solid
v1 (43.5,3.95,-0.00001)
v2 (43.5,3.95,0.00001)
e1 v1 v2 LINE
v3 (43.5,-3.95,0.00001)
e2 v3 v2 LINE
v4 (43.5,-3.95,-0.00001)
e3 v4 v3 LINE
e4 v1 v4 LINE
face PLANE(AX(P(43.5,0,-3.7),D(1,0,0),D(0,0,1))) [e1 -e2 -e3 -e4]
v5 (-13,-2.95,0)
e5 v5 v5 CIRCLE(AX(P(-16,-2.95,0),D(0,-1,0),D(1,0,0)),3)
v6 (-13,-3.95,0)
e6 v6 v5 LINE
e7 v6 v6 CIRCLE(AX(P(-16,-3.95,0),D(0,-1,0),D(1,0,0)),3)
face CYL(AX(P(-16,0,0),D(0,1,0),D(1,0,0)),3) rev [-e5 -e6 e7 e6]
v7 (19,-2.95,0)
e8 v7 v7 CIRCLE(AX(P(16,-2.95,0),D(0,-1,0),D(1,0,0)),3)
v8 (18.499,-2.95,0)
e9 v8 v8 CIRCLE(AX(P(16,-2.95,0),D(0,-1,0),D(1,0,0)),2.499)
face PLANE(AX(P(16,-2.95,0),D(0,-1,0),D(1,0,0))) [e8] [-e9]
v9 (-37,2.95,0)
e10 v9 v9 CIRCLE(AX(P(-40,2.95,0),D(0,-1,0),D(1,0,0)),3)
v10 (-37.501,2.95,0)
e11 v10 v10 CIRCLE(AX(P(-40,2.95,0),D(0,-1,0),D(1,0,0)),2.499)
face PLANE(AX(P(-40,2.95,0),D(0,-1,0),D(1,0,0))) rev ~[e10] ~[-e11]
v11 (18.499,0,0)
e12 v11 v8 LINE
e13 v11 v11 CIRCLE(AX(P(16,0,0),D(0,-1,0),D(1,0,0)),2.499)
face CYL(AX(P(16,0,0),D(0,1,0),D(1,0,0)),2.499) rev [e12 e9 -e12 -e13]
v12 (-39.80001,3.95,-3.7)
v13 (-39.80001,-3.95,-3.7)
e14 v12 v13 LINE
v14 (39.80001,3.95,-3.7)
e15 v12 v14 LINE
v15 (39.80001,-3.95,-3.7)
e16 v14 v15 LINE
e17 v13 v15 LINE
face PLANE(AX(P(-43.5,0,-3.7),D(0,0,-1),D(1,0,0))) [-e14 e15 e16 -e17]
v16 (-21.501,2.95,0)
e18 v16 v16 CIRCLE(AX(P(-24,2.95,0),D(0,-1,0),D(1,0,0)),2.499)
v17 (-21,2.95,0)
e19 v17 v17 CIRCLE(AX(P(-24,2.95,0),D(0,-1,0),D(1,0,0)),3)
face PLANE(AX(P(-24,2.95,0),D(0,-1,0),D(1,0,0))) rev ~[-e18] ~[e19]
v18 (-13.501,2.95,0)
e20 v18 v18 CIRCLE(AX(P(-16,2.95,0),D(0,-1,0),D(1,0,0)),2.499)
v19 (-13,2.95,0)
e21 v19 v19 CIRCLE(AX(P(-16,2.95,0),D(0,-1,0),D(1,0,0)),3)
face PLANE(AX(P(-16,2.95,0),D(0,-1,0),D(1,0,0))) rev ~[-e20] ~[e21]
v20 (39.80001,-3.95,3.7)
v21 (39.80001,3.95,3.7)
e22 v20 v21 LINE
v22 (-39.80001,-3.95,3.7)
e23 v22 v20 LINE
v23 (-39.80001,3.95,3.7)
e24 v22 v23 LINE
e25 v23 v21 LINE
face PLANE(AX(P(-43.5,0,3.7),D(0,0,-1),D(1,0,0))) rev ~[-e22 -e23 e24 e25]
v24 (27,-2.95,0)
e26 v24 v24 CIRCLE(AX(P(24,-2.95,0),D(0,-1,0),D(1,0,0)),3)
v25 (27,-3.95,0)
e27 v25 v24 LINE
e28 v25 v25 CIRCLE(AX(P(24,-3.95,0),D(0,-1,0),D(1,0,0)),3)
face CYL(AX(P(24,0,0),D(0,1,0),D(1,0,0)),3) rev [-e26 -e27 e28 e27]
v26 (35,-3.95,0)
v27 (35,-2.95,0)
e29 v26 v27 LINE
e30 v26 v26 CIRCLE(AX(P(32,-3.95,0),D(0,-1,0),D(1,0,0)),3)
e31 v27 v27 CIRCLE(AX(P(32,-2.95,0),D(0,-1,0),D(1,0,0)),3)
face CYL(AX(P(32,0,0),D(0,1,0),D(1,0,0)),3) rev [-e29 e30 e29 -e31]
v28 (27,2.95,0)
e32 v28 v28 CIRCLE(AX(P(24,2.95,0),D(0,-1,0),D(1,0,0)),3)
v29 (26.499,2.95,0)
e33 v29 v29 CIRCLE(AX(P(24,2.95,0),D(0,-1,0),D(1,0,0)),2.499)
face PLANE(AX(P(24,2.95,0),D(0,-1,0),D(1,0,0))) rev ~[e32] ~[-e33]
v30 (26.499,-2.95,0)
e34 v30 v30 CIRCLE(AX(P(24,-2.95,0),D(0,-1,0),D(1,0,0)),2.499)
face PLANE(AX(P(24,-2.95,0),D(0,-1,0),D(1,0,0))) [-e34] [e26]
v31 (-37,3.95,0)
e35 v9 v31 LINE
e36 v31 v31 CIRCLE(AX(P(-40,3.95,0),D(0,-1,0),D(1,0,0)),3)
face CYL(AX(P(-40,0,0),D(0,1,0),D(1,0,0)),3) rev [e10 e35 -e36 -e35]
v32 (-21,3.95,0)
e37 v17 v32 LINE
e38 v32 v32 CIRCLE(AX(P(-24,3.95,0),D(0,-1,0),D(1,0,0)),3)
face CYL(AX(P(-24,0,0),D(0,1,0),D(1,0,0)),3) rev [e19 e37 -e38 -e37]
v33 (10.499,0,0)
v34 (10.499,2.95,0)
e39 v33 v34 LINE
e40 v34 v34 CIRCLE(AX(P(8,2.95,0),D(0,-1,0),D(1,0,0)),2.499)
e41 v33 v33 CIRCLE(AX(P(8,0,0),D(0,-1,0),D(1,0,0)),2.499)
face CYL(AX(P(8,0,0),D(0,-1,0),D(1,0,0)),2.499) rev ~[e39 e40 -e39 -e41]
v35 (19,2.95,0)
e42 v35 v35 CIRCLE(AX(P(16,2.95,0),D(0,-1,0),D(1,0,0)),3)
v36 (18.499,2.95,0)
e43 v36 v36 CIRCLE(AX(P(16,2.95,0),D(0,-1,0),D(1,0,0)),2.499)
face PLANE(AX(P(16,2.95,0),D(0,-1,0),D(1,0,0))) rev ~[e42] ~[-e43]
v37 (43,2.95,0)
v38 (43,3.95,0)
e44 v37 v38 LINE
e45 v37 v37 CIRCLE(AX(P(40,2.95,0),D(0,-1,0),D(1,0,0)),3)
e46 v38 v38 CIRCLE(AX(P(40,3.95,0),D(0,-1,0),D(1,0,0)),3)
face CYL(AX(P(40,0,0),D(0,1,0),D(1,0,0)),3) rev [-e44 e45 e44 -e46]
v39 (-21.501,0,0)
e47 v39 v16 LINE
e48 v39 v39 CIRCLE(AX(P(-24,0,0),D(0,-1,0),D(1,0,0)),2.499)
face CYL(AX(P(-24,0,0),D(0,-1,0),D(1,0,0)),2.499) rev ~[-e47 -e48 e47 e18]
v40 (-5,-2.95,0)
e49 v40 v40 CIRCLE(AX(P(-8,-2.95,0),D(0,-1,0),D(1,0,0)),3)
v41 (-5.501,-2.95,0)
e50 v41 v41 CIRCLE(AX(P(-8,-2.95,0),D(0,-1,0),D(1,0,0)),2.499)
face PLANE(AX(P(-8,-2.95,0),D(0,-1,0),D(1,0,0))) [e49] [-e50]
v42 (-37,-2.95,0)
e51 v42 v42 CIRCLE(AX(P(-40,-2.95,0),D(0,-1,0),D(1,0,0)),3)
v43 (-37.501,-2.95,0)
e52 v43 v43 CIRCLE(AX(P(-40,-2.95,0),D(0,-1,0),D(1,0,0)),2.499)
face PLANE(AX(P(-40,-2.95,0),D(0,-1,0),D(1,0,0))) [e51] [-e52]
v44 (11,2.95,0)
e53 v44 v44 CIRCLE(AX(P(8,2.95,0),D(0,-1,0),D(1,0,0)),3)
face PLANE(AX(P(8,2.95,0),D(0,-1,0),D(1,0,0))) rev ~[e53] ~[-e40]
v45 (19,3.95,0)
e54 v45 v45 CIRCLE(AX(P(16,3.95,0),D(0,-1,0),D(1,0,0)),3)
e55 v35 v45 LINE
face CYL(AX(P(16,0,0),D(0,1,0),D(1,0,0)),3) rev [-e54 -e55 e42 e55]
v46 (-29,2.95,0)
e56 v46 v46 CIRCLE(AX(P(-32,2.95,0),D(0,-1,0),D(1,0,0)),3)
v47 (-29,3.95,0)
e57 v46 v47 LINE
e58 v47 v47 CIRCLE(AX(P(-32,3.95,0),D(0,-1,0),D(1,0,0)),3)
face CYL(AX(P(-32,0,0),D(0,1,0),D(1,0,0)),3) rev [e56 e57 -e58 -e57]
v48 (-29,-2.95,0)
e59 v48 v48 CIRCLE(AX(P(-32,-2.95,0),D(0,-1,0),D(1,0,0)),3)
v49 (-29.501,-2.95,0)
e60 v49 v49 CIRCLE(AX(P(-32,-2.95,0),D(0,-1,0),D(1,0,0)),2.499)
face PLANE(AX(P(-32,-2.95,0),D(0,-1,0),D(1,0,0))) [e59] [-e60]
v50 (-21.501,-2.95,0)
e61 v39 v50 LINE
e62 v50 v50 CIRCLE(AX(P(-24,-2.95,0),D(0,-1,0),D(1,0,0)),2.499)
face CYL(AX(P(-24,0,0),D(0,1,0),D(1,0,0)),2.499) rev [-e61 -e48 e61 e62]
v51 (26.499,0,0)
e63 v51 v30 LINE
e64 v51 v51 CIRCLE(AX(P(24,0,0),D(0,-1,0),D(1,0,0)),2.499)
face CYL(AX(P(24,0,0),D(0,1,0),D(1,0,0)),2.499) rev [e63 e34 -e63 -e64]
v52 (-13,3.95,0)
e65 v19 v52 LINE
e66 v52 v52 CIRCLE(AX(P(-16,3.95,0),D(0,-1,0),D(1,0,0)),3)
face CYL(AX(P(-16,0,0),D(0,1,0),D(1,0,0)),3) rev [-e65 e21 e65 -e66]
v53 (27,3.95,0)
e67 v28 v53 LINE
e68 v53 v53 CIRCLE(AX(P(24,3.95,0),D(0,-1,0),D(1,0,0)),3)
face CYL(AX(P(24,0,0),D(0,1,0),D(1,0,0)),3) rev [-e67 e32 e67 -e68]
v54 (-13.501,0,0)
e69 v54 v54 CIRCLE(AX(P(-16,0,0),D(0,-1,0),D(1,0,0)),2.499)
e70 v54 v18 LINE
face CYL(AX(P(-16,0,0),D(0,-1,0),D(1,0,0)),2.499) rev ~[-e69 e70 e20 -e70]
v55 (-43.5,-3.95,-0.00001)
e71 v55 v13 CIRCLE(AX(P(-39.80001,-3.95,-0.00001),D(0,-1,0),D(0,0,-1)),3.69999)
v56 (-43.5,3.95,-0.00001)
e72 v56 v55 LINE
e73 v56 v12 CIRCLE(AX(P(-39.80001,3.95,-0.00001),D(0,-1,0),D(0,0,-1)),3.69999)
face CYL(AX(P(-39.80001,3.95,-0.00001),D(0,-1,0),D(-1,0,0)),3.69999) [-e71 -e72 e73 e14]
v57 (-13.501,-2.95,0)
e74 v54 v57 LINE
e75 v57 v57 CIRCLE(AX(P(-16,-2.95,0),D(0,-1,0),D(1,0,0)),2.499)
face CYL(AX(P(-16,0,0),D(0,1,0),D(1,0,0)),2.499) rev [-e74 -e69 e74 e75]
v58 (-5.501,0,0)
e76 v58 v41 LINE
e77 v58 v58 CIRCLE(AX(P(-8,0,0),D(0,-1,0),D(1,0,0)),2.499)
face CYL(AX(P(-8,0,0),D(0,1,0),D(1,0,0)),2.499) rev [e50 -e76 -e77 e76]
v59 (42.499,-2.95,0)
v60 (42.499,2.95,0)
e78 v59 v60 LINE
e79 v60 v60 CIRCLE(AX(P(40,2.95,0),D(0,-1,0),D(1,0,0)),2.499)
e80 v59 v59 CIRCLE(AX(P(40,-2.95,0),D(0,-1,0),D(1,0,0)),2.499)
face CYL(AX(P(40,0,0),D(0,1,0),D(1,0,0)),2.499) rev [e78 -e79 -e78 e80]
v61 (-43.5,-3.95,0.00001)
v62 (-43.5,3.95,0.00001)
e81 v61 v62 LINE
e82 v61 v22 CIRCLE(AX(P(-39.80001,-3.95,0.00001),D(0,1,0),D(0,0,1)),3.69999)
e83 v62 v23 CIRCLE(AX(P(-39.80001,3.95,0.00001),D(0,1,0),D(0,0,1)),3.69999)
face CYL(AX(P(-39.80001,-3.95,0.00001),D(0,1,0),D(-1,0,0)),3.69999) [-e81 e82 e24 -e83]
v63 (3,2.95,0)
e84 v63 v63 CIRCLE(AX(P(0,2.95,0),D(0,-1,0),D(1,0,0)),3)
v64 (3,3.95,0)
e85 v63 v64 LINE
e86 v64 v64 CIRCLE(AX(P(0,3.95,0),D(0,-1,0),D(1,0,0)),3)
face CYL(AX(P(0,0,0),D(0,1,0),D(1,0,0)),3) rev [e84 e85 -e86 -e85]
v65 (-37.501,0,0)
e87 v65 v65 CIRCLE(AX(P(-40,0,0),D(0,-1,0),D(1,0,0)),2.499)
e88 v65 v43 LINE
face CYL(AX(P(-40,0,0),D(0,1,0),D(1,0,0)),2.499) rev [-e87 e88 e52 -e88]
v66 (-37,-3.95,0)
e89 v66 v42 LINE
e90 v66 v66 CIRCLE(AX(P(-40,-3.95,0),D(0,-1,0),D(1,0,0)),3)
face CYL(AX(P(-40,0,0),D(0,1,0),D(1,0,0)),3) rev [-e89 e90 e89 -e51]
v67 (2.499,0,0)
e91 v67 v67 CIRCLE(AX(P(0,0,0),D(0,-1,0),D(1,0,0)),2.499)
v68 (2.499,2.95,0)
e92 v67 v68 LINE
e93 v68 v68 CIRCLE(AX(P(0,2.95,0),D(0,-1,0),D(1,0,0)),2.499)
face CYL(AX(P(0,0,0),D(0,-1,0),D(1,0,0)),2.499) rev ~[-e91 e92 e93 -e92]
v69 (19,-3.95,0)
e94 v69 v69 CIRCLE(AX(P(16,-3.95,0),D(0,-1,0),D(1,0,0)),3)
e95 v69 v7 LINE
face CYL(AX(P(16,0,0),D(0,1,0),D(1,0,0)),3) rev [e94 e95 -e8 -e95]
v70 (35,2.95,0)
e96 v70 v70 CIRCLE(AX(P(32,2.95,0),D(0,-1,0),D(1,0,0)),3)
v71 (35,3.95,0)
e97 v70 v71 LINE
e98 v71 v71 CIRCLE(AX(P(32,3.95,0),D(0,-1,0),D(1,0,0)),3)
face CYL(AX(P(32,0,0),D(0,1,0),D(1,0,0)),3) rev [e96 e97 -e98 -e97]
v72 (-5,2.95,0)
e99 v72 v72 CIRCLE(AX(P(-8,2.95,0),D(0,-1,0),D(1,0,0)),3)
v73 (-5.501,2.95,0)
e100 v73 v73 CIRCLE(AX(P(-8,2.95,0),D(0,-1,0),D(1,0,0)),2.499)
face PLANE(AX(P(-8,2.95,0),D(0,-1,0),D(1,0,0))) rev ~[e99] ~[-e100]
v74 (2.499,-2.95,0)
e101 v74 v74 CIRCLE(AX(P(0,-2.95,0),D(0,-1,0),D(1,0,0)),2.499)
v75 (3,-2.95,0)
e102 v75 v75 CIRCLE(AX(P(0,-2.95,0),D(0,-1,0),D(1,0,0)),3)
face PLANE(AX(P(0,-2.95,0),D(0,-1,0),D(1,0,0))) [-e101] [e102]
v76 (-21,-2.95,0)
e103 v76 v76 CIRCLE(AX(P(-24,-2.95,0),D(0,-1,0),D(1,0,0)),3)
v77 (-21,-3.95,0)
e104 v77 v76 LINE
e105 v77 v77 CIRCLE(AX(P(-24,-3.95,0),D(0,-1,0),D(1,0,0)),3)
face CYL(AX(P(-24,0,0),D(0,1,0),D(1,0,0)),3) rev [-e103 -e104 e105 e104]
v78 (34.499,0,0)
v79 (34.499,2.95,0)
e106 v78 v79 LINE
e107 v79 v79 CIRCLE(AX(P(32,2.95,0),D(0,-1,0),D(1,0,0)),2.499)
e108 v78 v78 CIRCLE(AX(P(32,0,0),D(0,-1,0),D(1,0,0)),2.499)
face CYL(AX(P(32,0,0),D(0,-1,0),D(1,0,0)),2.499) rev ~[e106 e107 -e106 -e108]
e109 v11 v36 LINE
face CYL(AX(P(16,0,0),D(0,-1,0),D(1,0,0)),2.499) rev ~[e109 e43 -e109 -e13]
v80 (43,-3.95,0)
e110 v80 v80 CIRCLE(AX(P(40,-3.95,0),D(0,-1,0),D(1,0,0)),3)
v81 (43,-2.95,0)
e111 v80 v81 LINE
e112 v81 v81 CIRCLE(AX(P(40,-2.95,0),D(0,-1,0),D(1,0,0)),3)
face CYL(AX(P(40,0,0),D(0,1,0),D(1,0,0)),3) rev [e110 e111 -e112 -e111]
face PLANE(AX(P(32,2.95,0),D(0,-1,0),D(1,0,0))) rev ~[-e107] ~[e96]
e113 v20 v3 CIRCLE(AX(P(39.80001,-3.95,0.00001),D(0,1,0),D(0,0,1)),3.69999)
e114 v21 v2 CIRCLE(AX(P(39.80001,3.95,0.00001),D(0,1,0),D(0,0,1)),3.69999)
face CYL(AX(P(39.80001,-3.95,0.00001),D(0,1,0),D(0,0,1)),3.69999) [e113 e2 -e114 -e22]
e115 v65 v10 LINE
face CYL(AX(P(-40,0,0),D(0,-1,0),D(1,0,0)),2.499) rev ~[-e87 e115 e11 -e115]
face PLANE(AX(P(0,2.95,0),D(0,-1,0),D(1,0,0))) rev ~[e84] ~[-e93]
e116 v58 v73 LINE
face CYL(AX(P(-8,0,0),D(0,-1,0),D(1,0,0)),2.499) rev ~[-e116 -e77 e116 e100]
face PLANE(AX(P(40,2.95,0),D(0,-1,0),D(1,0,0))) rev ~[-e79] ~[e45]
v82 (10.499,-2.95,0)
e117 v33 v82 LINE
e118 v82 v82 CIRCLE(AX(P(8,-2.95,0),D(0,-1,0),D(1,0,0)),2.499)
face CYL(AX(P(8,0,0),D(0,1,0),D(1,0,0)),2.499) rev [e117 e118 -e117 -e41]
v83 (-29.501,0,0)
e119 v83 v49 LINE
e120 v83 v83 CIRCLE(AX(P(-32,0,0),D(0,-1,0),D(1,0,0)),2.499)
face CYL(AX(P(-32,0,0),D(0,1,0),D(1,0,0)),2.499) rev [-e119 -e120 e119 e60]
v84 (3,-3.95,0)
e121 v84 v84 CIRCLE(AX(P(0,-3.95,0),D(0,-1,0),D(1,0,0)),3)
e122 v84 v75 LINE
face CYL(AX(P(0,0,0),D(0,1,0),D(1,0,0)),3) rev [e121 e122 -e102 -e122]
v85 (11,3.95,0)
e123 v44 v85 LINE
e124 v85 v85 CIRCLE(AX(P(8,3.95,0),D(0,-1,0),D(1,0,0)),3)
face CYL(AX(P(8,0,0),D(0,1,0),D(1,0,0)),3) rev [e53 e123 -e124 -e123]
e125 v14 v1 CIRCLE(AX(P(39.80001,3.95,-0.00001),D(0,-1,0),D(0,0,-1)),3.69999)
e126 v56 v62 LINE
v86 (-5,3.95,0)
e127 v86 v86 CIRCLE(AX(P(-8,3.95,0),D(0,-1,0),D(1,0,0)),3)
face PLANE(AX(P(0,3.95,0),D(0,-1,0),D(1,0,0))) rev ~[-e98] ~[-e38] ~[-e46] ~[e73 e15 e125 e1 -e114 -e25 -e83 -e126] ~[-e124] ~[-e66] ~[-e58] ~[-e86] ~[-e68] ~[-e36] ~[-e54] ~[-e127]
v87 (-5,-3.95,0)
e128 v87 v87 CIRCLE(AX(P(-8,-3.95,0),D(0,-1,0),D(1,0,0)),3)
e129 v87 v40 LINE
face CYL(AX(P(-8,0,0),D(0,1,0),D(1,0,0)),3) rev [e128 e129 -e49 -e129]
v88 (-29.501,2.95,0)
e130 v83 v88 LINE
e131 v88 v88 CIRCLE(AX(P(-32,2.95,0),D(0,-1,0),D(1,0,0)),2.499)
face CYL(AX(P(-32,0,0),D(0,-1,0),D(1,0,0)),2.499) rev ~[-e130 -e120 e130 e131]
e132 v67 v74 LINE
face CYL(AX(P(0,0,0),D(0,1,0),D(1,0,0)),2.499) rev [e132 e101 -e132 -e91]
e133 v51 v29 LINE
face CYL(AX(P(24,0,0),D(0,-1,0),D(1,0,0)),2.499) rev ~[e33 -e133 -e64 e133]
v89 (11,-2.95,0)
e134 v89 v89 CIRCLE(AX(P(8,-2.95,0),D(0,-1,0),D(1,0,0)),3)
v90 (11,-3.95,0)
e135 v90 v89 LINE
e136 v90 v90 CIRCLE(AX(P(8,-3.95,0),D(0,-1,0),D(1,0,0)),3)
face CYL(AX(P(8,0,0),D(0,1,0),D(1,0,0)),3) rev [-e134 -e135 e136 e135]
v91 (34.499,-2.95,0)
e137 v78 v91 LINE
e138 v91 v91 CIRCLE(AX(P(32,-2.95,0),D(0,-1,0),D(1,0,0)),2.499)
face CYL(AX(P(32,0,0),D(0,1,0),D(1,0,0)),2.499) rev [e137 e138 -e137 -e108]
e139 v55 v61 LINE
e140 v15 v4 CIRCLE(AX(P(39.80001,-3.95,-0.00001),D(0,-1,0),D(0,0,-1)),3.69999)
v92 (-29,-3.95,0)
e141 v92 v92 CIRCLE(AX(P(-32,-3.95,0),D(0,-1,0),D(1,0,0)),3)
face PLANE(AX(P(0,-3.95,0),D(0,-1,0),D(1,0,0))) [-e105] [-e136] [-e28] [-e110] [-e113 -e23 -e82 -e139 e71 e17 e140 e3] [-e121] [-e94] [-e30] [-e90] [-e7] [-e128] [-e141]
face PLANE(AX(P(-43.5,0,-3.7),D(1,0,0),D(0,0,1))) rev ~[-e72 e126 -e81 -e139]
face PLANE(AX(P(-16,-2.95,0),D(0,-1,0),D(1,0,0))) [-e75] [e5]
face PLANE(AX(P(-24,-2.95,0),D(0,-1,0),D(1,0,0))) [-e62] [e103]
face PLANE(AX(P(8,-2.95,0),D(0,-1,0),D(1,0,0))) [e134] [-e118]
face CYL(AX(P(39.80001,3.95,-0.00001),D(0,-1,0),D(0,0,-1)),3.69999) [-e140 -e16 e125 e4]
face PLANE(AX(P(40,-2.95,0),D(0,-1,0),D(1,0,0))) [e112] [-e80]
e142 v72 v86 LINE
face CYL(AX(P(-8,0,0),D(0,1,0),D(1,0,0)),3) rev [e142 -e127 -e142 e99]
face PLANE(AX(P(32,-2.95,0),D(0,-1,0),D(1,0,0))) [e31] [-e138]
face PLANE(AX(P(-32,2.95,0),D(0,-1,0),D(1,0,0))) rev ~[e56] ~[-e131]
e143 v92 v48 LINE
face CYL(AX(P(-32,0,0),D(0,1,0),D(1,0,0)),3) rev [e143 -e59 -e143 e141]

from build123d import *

# Parameters (mm, degrees)
F0_W     = 87
F0_H     = 7.4
F0_R     = 3
F1_DEPTH = 3.95
F0_R_2   = 2.499
F2_DEPTH = 2.95
F3_R     = 3.69999


# Not quite as in the source:
# - a fillet or chamfer is up to 0.001 mm smaller than in the source, because OpenCascade refuses the exact size


with BuildPart() as f1:
    # F0 (on Front) → F1 (new body, symmetric)
    with BuildSketch(Plane.XZ):
        Rectangle(F0_W, F0_H)
        with Locations((-40, 0)):
            Circle(F0_R, mode=Mode.SUBTRACT)
        with Locations((-32, 0)):
            Circle(F0_R, mode=Mode.SUBTRACT)
        with Locations((-24, 0)):
            Circle(F0_R, mode=Mode.SUBTRACT)
        with Locations((-16, 0)):
            Circle(F0_R, mode=Mode.SUBTRACT)
        with Locations((-8, 0)):
            Circle(F0_R, mode=Mode.SUBTRACT)
        Circle(F0_R, mode=Mode.SUBTRACT)
        with Locations((8, 0)):
            Circle(F0_R, mode=Mode.SUBTRACT)
        with Locations((16, 0)):
            Circle(F0_R, mode=Mode.SUBTRACT)
        with Locations((24, 0)):
            Circle(F0_R, mode=Mode.SUBTRACT)
        with Locations((32, 0)):
            Circle(F0_R, mode=Mode.SUBTRACT)
        with Locations((40, 0)):
            Circle(F0_R, mode=Mode.SUBTRACT)
    extrude(amount=F1_DEPTH, both=True)

    # F0 (on Front) → F2 (join, symmetric)
    with BuildSketch(Plane.XZ):
        with Locations((-40, 0)):
            Circle(F0_R)
        with Locations((-40, 0)):
            Circle(F0_R_2, mode=Mode.SUBTRACT)
        with Locations((-32, 0)):
            Circle(F0_R)
        with Locations((-32, 0)):
            Circle(F0_R_2, mode=Mode.SUBTRACT)
        with Locations((-24, 0)):
            Circle(F0_R)
        with Locations((-24, 0)):
            Circle(F0_R_2, mode=Mode.SUBTRACT)
        with Locations((-16, 0)):
            Circle(F0_R)
        with Locations((-16, 0)):
            Circle(F0_R_2, mode=Mode.SUBTRACT)
        with Locations((-8, 0)):
            Circle(F0_R)
        with Locations((-8, 0)):
            Circle(F0_R_2, mode=Mode.SUBTRACT)
        Circle(F0_R)
        Circle(F0_R_2, mode=Mode.SUBTRACT)
        with Locations((8, 0)):
            Circle(F0_R)
        with Locations((8, 0)):
            Circle(F0_R_2, mode=Mode.SUBTRACT)
        with Locations((16, 0)):
            Circle(F0_R)
        with Locations((16, 0)):
            Circle(F0_R_2, mode=Mode.SUBTRACT)
        with Locations((24, 0)):
            Circle(F0_R)
        with Locations((24, 0)):
            Circle(F0_R_2, mode=Mode.SUBTRACT)
        with Locations((32, 0)):
            Circle(F0_R)
        with Locations((32, 0)):
            Circle(F0_R_2, mode=Mode.SUBTRACT)
        with Locations((40, 0)):
            Circle(F0_R)
        with Locations((40, 0)):
            Circle(F0_R_2, mode=Mode.SUBTRACT)
    extrude(amount=F2_DEPTH, both=True)

    # F3 (radius 3.7 in the source; OpenCascade refuses exactly that, so slightly less here)
    f3_edges = [f1.edges().sort_by_distance(p)[0] for p in [
        (-43.5, 0, 3.7),
        (-43.5, 0, -3.7),
        (43.5, 0, 3.7),
        (43.5, 0, -3.7),
    ]]
    fillet(f3_edges, radius=F3_R)


solid = f1.part
